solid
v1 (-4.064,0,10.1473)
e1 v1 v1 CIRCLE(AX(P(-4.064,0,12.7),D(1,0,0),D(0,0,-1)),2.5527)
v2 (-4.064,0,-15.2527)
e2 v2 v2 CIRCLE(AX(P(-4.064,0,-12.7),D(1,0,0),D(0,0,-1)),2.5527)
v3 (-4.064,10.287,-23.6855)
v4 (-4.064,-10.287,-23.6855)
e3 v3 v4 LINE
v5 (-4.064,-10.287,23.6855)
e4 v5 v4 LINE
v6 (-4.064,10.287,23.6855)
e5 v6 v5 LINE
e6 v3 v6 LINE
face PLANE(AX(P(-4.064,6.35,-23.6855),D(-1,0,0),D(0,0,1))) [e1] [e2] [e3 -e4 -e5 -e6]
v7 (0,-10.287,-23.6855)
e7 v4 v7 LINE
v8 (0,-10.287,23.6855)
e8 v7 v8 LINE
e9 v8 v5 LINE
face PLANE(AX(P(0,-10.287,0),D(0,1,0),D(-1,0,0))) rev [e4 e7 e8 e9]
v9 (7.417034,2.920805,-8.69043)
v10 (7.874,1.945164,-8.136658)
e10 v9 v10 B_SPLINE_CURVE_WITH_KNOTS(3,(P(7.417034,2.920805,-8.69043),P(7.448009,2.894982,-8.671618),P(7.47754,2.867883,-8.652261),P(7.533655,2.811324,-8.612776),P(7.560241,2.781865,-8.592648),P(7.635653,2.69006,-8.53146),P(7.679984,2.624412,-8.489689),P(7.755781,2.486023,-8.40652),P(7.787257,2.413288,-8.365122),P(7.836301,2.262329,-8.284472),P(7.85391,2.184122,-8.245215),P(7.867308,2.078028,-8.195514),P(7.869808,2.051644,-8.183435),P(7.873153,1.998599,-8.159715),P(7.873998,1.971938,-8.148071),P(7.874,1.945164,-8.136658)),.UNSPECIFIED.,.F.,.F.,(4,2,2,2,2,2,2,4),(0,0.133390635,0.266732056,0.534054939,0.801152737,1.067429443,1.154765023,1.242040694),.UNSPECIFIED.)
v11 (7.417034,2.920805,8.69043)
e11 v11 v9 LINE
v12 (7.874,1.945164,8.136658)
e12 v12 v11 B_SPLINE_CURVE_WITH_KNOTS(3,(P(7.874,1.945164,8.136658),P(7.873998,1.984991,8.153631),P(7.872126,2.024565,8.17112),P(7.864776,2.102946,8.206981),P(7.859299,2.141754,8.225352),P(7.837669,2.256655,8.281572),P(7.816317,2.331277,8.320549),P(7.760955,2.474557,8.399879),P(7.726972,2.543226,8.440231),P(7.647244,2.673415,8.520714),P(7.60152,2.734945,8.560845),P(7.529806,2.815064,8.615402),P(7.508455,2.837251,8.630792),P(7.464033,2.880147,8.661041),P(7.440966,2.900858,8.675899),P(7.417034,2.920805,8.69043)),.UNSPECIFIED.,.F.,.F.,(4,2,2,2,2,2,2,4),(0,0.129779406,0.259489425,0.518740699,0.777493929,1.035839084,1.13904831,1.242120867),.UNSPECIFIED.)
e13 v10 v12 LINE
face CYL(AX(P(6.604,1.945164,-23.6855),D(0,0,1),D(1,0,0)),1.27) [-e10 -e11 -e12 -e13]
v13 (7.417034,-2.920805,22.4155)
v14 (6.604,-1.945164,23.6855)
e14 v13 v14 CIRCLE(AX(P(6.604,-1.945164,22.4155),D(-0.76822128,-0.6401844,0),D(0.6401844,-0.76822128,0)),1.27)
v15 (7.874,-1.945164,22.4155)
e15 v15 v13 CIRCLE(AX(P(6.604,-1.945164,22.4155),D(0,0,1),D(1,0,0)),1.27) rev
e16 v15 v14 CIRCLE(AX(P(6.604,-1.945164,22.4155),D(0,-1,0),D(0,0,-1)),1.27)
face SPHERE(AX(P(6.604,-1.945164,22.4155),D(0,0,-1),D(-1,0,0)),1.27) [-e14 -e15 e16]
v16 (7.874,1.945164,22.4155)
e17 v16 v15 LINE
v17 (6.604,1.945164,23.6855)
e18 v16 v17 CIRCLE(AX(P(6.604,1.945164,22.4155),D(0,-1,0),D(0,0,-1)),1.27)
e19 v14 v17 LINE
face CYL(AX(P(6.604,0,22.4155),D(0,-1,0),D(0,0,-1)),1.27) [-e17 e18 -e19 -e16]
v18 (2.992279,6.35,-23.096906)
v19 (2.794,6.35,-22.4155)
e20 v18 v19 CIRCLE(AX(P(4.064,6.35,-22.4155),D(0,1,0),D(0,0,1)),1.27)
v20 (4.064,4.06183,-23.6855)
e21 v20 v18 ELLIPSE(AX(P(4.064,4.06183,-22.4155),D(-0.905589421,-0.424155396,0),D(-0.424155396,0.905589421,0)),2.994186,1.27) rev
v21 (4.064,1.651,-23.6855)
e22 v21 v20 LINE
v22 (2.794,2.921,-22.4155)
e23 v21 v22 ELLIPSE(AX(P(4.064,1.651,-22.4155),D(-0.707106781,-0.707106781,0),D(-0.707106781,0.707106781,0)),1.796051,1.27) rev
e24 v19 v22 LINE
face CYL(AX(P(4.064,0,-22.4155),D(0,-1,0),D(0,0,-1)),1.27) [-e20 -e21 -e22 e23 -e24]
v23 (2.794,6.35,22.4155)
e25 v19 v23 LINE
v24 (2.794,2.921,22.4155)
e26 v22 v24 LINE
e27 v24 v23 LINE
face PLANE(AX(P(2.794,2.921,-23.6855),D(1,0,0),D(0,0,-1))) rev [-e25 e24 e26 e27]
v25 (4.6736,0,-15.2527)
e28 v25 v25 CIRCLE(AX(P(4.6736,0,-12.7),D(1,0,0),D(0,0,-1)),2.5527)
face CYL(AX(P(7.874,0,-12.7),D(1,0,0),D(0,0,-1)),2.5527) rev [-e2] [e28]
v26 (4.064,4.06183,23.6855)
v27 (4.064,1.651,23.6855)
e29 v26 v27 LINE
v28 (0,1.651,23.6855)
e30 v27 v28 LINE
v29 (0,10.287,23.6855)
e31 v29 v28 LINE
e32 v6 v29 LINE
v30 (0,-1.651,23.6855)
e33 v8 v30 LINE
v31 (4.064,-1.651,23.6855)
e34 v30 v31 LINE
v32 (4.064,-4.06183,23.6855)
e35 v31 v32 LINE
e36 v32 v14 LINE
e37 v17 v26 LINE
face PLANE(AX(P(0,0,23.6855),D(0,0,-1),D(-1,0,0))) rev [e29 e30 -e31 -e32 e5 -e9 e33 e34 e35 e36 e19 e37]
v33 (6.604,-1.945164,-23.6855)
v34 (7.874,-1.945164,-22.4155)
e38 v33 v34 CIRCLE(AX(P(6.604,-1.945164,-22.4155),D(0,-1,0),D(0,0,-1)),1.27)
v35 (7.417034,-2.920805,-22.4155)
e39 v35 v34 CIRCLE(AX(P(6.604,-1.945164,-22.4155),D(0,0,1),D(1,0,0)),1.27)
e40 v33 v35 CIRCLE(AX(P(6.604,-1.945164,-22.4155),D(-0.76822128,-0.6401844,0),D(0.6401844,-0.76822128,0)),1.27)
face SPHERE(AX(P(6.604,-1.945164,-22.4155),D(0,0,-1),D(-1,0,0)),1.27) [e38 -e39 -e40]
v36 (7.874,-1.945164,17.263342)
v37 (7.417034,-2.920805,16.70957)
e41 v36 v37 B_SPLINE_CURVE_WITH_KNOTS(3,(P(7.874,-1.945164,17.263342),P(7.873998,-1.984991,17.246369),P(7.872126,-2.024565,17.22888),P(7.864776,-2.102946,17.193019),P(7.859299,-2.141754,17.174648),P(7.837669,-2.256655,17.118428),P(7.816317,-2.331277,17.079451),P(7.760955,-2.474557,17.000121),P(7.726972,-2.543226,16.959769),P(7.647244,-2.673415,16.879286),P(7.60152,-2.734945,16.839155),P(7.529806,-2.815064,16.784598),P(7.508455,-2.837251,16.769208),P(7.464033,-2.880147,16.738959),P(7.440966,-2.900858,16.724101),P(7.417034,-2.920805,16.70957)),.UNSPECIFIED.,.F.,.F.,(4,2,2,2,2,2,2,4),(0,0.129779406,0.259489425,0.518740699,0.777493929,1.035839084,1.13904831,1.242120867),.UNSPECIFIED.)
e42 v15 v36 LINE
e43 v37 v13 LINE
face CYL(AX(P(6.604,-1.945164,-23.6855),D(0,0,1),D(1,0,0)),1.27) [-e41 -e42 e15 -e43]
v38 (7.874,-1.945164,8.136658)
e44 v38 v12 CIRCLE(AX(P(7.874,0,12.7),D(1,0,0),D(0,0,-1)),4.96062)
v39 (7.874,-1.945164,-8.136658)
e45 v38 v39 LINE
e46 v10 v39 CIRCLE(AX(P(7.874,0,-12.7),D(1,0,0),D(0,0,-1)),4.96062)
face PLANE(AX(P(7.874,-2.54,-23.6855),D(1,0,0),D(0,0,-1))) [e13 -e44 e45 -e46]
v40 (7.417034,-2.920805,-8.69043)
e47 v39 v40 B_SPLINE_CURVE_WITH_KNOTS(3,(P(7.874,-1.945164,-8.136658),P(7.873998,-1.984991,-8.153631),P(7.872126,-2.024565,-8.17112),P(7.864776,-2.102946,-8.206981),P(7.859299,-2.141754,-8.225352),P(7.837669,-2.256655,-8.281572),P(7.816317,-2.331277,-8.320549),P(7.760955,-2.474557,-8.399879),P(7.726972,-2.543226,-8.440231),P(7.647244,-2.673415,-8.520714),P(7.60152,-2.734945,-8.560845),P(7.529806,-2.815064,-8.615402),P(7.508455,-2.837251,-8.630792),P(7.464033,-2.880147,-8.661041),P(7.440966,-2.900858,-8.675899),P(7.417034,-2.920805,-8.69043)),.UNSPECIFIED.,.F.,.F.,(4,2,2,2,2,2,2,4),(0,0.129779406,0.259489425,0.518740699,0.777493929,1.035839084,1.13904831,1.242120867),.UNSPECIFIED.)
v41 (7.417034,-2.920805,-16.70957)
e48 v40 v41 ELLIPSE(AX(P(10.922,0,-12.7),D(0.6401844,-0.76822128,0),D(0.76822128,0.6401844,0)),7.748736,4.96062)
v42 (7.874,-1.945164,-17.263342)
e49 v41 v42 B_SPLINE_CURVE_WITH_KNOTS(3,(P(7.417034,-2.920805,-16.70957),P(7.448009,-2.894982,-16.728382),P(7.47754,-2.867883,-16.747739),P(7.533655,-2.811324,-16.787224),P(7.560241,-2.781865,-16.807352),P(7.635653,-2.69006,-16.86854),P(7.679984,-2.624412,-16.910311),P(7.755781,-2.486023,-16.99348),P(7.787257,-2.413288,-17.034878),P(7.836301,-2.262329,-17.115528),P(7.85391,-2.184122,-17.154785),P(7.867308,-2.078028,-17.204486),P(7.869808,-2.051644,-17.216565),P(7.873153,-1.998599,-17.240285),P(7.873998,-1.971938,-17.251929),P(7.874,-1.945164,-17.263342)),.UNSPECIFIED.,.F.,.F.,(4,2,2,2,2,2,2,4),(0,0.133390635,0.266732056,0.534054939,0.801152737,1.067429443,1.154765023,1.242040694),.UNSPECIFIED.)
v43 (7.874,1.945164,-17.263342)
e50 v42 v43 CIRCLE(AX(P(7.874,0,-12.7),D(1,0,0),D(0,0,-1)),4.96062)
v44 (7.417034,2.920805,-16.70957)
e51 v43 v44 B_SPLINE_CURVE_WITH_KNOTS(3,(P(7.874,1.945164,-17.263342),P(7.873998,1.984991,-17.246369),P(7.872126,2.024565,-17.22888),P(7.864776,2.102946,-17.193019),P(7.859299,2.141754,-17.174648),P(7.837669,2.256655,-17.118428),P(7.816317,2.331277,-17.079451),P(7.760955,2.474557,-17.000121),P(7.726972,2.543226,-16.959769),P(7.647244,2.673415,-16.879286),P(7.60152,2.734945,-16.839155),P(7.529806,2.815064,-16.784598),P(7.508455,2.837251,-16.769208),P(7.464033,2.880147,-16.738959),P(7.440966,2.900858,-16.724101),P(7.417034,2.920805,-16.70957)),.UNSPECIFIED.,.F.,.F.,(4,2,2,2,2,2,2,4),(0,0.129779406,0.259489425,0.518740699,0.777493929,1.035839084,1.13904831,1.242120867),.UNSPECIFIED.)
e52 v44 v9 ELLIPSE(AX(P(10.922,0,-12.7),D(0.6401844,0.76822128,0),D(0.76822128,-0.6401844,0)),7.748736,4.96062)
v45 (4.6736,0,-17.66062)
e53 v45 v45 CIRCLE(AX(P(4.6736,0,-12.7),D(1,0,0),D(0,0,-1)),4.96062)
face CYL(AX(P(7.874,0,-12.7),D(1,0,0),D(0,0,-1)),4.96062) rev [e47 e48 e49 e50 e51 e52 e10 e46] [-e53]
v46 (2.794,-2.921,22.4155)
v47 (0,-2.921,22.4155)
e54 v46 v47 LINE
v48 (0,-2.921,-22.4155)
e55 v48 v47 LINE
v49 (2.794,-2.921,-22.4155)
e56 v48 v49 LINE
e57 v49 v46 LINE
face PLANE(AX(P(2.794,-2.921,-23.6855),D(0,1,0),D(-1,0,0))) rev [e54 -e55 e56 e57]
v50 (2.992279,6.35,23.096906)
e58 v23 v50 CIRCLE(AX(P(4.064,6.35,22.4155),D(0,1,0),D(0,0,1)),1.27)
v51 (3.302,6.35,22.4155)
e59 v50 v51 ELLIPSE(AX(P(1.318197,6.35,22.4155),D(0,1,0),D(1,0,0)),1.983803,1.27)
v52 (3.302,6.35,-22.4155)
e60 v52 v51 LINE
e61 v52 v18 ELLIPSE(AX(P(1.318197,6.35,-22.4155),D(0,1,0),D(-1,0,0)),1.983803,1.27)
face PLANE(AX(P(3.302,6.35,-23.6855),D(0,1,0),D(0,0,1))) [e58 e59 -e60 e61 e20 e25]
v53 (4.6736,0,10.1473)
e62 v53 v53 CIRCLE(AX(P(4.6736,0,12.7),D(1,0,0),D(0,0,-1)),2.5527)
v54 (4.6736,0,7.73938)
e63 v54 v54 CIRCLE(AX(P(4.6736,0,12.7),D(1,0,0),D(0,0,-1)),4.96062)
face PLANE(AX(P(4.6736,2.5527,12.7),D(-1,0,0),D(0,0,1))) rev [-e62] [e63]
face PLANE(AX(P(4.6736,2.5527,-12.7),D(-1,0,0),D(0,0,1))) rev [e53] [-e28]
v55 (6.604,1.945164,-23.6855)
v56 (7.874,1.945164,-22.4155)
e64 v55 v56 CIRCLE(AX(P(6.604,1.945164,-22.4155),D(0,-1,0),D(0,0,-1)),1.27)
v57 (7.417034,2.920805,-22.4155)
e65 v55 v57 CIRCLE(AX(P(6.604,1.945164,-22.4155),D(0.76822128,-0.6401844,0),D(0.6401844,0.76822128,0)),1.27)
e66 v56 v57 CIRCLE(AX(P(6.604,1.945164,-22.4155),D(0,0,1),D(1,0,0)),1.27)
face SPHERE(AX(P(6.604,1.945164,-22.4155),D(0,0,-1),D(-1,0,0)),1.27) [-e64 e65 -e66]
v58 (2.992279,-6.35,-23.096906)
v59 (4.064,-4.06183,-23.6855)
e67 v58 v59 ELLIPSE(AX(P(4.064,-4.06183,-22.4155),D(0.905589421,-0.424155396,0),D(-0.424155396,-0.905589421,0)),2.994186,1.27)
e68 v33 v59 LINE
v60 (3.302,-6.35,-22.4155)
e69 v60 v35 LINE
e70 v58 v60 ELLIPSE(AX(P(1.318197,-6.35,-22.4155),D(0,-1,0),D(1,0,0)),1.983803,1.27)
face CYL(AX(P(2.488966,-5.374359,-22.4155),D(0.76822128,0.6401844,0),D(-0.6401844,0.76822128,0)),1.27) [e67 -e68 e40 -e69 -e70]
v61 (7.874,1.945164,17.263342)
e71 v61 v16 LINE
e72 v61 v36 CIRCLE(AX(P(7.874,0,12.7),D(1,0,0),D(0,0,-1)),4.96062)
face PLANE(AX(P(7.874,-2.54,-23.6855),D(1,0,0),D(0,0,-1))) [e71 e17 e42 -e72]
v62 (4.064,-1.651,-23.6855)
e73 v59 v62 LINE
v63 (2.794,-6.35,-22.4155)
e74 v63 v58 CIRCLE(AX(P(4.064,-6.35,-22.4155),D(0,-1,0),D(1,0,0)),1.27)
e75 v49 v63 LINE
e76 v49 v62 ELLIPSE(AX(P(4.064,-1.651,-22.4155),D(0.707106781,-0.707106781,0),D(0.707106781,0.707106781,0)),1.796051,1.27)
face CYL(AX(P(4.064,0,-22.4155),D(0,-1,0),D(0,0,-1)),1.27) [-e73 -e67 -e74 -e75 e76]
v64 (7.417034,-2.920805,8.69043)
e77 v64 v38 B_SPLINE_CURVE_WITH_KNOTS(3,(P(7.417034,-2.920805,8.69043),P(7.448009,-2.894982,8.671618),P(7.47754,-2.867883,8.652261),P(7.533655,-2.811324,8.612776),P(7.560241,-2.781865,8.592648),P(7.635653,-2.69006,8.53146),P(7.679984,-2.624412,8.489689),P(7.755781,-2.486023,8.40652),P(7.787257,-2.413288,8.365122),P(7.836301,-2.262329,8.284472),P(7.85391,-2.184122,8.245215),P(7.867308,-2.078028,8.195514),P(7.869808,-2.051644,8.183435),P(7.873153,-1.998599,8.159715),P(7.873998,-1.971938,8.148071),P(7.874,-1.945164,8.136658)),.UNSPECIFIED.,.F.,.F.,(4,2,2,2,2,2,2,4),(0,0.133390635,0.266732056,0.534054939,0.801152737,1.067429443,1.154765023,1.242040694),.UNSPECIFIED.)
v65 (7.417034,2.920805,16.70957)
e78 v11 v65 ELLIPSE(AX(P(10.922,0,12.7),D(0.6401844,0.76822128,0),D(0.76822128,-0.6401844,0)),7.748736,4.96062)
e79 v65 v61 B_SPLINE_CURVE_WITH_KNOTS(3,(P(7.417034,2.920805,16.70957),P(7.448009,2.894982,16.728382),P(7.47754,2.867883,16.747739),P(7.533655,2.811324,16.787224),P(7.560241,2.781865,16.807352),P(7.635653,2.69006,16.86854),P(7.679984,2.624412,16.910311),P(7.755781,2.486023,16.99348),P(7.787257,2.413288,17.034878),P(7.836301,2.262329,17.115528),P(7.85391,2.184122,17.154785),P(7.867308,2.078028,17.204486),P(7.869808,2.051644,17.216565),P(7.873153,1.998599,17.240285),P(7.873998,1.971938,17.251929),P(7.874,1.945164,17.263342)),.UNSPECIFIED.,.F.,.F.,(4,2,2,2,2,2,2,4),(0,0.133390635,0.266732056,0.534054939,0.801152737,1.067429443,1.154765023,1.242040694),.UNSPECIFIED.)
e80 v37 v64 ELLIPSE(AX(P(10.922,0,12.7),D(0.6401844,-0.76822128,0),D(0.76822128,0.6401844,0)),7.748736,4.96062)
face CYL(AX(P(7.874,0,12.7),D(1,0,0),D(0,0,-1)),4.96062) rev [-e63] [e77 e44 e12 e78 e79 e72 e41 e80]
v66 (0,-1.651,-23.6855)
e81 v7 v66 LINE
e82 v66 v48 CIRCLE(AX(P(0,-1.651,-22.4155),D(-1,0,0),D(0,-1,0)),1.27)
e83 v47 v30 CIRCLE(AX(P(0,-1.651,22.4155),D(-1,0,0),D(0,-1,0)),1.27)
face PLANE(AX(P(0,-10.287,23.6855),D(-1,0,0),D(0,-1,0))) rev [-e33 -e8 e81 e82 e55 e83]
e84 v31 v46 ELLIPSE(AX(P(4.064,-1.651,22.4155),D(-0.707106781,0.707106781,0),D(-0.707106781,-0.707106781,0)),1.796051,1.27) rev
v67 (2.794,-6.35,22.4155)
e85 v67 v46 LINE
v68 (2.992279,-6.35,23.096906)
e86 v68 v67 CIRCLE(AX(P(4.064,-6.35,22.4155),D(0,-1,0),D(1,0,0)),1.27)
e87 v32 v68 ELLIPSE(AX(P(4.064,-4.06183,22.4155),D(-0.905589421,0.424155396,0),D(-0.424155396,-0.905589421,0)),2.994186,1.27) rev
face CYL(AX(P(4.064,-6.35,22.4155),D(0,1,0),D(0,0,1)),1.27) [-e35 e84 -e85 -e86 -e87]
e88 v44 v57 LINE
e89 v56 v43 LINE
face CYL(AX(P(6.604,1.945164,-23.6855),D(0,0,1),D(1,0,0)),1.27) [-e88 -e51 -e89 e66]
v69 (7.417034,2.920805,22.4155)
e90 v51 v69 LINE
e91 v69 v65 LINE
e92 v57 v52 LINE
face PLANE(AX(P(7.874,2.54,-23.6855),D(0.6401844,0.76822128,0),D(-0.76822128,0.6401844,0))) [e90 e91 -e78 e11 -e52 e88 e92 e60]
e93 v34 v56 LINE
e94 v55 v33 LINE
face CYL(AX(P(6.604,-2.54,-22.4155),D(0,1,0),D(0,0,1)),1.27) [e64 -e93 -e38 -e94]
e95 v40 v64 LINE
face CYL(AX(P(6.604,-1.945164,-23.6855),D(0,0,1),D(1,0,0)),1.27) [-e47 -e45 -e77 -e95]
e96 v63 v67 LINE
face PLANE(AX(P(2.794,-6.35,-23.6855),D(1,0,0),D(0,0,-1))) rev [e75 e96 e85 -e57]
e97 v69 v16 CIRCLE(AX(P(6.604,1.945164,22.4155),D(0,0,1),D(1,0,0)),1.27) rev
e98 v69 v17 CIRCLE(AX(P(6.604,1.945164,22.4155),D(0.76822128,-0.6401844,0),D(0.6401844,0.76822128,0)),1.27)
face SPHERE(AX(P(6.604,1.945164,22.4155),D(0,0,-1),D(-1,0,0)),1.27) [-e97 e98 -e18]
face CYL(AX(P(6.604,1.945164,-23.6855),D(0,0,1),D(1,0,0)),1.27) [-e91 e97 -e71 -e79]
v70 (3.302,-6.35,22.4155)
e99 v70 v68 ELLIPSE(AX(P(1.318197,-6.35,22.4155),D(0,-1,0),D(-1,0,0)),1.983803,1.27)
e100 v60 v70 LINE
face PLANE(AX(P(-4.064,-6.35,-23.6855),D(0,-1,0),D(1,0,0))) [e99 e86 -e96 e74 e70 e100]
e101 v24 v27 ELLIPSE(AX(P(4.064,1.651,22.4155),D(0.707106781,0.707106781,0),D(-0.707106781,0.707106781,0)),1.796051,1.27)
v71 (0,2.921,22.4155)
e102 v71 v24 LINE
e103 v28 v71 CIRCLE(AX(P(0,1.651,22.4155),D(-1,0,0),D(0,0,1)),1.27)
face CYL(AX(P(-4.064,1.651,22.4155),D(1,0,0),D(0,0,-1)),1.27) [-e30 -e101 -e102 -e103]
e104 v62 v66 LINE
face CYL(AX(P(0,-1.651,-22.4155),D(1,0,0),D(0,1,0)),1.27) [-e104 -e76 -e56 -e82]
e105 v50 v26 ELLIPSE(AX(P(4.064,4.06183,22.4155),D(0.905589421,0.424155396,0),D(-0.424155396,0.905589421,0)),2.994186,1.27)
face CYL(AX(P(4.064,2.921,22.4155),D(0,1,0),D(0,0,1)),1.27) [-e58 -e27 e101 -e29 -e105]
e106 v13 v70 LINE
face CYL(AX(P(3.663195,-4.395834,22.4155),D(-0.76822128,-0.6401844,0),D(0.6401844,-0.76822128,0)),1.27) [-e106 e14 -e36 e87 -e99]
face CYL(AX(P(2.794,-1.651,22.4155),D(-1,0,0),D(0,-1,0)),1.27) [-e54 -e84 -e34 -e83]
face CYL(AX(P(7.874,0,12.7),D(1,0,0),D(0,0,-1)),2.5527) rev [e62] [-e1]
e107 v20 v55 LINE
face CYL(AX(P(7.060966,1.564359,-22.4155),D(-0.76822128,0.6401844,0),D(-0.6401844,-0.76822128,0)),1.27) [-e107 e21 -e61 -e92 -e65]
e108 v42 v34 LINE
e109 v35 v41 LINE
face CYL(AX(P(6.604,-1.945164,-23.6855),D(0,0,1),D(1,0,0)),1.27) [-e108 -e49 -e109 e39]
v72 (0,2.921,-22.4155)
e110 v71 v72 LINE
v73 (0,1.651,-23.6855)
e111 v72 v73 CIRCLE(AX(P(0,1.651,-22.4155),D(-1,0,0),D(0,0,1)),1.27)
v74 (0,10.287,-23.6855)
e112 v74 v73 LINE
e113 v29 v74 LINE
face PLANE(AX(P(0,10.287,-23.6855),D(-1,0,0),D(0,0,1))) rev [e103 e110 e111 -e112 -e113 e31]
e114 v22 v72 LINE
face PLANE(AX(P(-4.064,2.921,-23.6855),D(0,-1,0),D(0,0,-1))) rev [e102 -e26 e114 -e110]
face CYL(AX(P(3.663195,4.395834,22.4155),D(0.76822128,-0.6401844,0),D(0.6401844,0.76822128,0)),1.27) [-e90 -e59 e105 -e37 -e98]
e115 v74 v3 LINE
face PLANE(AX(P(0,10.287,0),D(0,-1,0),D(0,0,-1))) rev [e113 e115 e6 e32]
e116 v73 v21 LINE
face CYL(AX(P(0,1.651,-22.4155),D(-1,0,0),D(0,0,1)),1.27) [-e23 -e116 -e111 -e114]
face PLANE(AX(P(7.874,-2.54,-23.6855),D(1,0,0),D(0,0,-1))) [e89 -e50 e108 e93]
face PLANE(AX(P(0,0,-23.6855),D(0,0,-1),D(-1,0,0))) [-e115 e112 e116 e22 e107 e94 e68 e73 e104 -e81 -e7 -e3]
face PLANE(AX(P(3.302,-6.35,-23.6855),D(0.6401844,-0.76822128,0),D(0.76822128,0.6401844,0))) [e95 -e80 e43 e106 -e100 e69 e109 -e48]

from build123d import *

# Parameters (mm, degrees)
BOSS_EXTRUDE1_DEPTH                             = 47.371
SKETCH2_W                                       = 6.858
SKETCH2_H                                       = 3.429
CUT_EXTRUDE1_DEPTH                              = 49.438972089
SKETCH3_W                                       = 4.064
SKETCH3_H                                       = 47.371
BOSS_EXTRUDE2_DEPTH                             = 7.366
SKETCH4_W                                       = 6.858
SKETCH4_H                                       = 3.429
CUT_EXTRUDE2_DEPTH                              = 50.110425431
SKETCH5_W                                       = 4.064
SKETCH5_H                                       = 47.371
BOSS_EXTRUDE3_DEPTH                             = 7.366
F_3_CLEARANCE_HOLE1_D                           = 2.7686
CBORE_FOR_10_BUTTON_HEAD_CAP_SCREW1_D           = 5.1054
CBORE_FOR_10_BUTTON_HEAD_CAP_SCREW1_CBORE_D     = 9.92124
CBORE_FOR_10_BUTTON_HEAD_CAP_SCREW1_CBORE_DEPTH = 3.2004
FILLET1_R                                       = 1.27
FILLET3_R                                       = 1.27
FILLET5_R                                       = 1.27


with BuildPart() as part:
    # Sketch1 → Boss-Extrude1 (new body)
    with BuildSketch(Plane.XY.offset(23.6855)):
        Polygon((3.302, 6.35), (-4.064, 6.35), (-4.064, -6.35), (3.302, -6.35), (7.874, -2.54), (7.874, 2.54), align=None)
    extrude(amount=-BOSS_EXTRUDE1_DEPTH)

    # Sketch2 → Cut-Extrude1 (cut, through all)
    with BuildSketch(Plane.XY.offset(23.6855)):
        with Locations((-0.635, 4.6355)):
            Rectangle(SKETCH2_W, SKETCH2_H)
    extrude(amount=-CUT_EXTRUDE1_DEPTH, mode=Mode.SUBTRACT)

    # Sketch3 → Boss-Extrude2 (add)
    with BuildSketch(Plane(origin=(0, 2.921, 0), x_dir=(-1, 0, 0), z_dir=(0, 1, 0))):
        with Locations((2.032, 0)):
            Rectangle(SKETCH3_W, SKETCH3_H)
    extrude(amount=BOSS_EXTRUDE2_DEPTH)

    # Sketch4 → Cut-Extrude2 (cut, through all)
    with BuildSketch(Plane.XY.offset(23.6855)):
        with Locations((-0.635, -4.6355)):
            Rectangle(SKETCH4_W, SKETCH4_H)
    extrude(amount=-CUT_EXTRUDE2_DEPTH, mode=Mode.SUBTRACT)

    # Sketch5 → Boss-Extrude3 (add)
    with BuildSketch(Plane.XZ.offset(2.921)):
        with Locations((-2.032, 0)):
            Rectangle(SKETCH5_W, SKETCH5_H)
    extrude(amount=BOSS_EXTRUDE3_DEPTH)

    # #3 Clearance Hole1 (through all)
    with Locations(Plane.ZY.offset(4.064)):
        with Locations((12.7, 0), (-12.7, 0)):
            Hole(F_3_CLEARANCE_HOLE1_D / 2)

    # CBORE for #10 Button Head Cap Screw1 (through all)
    with Locations(Plane(origin=(7.874, 0, 0), x_dir=(0, 0, -1), z_dir=(1, 0, 0))):
        with Locations((-12.7, 0), (12.7, 0)):
            CounterBoreHole(CBORE_FOR_10_BUTTON_HEAD_CAP_SCREW1_D / 2, CBORE_FOR_10_BUTTON_HEAD_CAP_SCREW1_CBORE_D / 2, CBORE_FOR_10_BUTTON_HEAD_CAP_SCREW1_CBORE_DEPTH)

    # Fillet1
    fillet1_edges = [part.edges().sort_by_distance(p)[0] for p in [
        (7.874, -2.54, 20.323251747),
        (7.874, -2.54, -20.323251747),
        (7.874, -2.54, 0),
        (7.874, 2.54, 20.323251747),
        (7.874, 2.54, 0),
        (7.874, 2.54, -20.323251747),
    ]]
    fillet(fillet1_edges, radius=FILLET1_R)

    # Fillet3
    # the kernel refuses this fillet: 1.27 mm, written as the material it takes off along each edge
    with BuildSketch(Plane(origin=(0.862897437, -8.382585469, -23.6855), x_dir=(0, 0, 1), z_dir=(0.7682212795973759, 0.6401843996644799, 0)), Plane(origin=(7.417034188, 2.920804844, -23.6855), x_dir=(0, 0, 1), z_dir=(-0.7682212795973759, 0.6401843996644799, 0))) as fillet3_piece_1:
        with BuildLine():
            CenterArc((FILLET3_R, -FILLET3_R), FILLET3_R, 90, 90)
            Line((0, -FILLET3_R), (0, 0))
            Line((0, 0), (FILLET3_R, 0))
        make_face()
    extrude(amount=8.531574072, mode=Mode.SUBTRACT)
    with BuildSketch(Plane(origin=(6.604, -1.945163819, -23.6855), x_dir=(0.6401843996644796, -0.7682212795973762, 0), z_dir=(-0.7682212795973762, -0.6401843996644796, 0))) as fillet3_piece_2:
        with BuildLine():
            CenterArc((1.27 - FILLET3_R, FILLET3_R), FILLET3_R, 270, 90)
            Line((1.27, FILLET3_R), (1.27, 0))
            Line((1.27, 0), (1.27 - FILLET3_R, 0))
        make_face()
    revolve(axis=Axis((6.604, -1.945163819, -23.6855), (0, 0, 1)), revolution_arc=50.194428908, mode=Mode.SUBTRACT)
    with BuildSketch(Plane(origin=(6.604, 1.945163819, -23.6855), x_dir=(0.6401843996644799, 0.7682212795973757, 0), z_dir=(-0.7682212795973757, 0.6401843996644799, 0))) as fillet3_piece_3:
        with BuildLine():
            CenterArc((1.27 - FILLET3_R, -FILLET3_R), FILLET3_R, 0, 90)
            Line((1.27, -FILLET3_R), (1.27, 0))
            Line((1.27, 0), (1.27 - FILLET3_R, 0))
        make_face()
    revolve(axis=Axis((6.604, 1.945163819, -23.6855), (0, 0, -1)), revolution_arc=50.194428908, mode=Mode.SUBTRACT)
    with BuildSketch(Plane(origin=(2.794, -2.921, -23.6855), x_dir=(0, 0, 1), z_dir=(-1, 0, 0)), Plane(origin=(0, 2.921, -23.6855), x_dir=(0, 0, 1), z_dir=(1, 0, 0))) as fillet3_piece_4:
        with BuildLine():
            CenterArc((FILLET3_R, FILLET3_R), FILLET3_R, 180, 90)
            Line((0, FILLET3_R), (0, 0))
            Line((0, 0), (FILLET3_R, 0))
        make_face()
    extrude(amount=2.794, mode=Mode.SUBTRACT)
    with BuildSketch(Plane(origin=(2.794, 2.921, -23.6855), x_dir=(0, 0, 1), z_dir=(0, 1, 0)), Plane(origin=(2.794, -9.525, -23.6855), x_dir=(0, 0, 1), z_dir=(0, 1, 0))) as fillet3_piece_5:
        with BuildLine():
            CenterArc((FILLET3_R, FILLET3_R), FILLET3_R, 180, 90)
            Line((0, FILLET3_R), (0, 0))
            Line((0, 0), (FILLET3_R, 0))
        make_face()
    extrude(amount=6.604, mode=Mode.SUBTRACT)
    with BuildSketch(Plane(origin=(7.874, -1.945163819, -23.6855), x_dir=(-1, 0, 0), z_dir=(0, 1, 0))) as fillet3_piece_6:
        with BuildLine():
            CenterArc((FILLET3_R, FILLET3_R), FILLET3_R, 180, 90)
            Line((0, FILLET3_R), (0, 0))
            Line((0, 0), (FILLET3_R, 0))
        make_face()
    extrude(amount=3.890327637, mode=Mode.SUBTRACT)
    with BuildSketch(Plane(origin=(2.794, -9.525, -23.6855), x_dir=(0, 0, 1), z_dir=(0, 1, 0))) as fillet3_piece_7a_section:
        with BuildLine():
            CenterArc((FILLET3_R, FILLET3_R), FILLET3_R, 180, 90)
            Line((0, FILLET3_R), (0, 0))
            Line((0, 0), (FILLET3_R, 0))
        make_face()
    fillet3_piece_7a = extrude(amount=9.779, mode=Mode.PRIVATE)
    fillet3_piece_7a = split(fillet3_piece_7a, bisect_by=Plane(origin=(3.081521795, -2.921, -23.397978205), z_dir=(0, 1, 0)), keep=Keep.TOP, mode=Mode.PRIVATE)
    with BuildSketch(Plane(origin=(5.969, -2.921, -23.6855), x_dir=(0, 0, 1), z_dir=(-1, 0, 0))) as fillet3_piece_7b_section:
        with BuildLine():
            CenterArc((FILLET3_R, FILLET3_R), FILLET3_R, 180, 90)
            Line((0, FILLET3_R), (0, 0))
            Line((0, 0), (FILLET3_R, 0))
        make_face()
    fillet3_piece_7b = extrude(amount=5.969, mode=Mode.PRIVATE)
    fillet3_piece_7b = split(fillet3_piece_7b, bisect_by=Plane(origin=(2.794, -2.633478205, -23.397978205), z_dir=(1, 0, 0)), keep=Keep.TOP, mode=Mode.PRIVATE)
    fillet3_piece_7 = fillet3_piece_7a & fillet3_piece_7b
    add(fillet3_piece_7, mode=Mode.SUBTRACT)
    with BuildSketch(Plane(origin=(2.794, -0.254, -23.6855), x_dir=(0, 0, 1), z_dir=(0, 1, 0))) as fillet3_piece_8a_section:
        with BuildLine():
            CenterArc((FILLET3_R, FILLET3_R), FILLET3_R, 180, 90)
            Line((0, FILLET3_R), (0, 0))
            Line((0, 0), (FILLET3_R, 0))
        make_face()
    fillet3_piece_8a = extrude(amount=9.779, mode=Mode.PRIVATE)
    fillet3_piece_8a = split(fillet3_piece_8a, bisect_by=Plane(origin=(3.081521795, 2.921, -23.397978205), z_dir=(0, -1, 0)), keep=Keep.TOP, mode=Mode.PRIVATE)
    with BuildSketch(Plane(origin=(0, 2.921, -23.6855), x_dir=(0, 0, 1), z_dir=(1, 0, 0))) as fillet3_piece_8b_section:
        with BuildLine():
            CenterArc((FILLET3_R, FILLET3_R), FILLET3_R, 180, 90)
            Line((0, FILLET3_R), (0, 0))
            Line((0, 0), (FILLET3_R, 0))
        make_face()
    fillet3_piece_8b = extrude(amount=5.969, mode=Mode.PRIVATE)
    fillet3_piece_8b = split(fillet3_piece_8b, bisect_by=Plane(origin=(2.794, 2.633478205, -23.397978205), z_dir=(1, 0, 0)), keep=Keep.TOP, mode=Mode.PRIVATE)
    fillet3_piece_8 = fillet3_piece_8a & fillet3_piece_8b
    add(fillet3_piece_8, mode=Mode.SUBTRACT)

    # Fillet5
    # the kernel refuses this fillet: 1.27 mm, written as the material it takes off along each edge
    with BuildSketch(Plane(origin=(0.862897437, -8.382585469, 23.6855), x_dir=(-0.6401843996644799, 0.7682212795973759, 0), z_dir=(0.7682212795973759, 0.6401843996644799, 0)), Plane(origin=(7.417034188, 2.920804844, 23.6855), x_dir=(-0.6401843996644799, -0.7682212795973759, 0), z_dir=(-0.7682212795973759, 0.6401843996644799, 0))) as fillet5_piece_1:
        with BuildLine():
            CenterArc((FILLET5_R, -FILLET5_R), FILLET5_R, 90, 90)
            Line((0, -FILLET5_R), (0, 0))
            Line((0, 0), (FILLET5_R, 0))
        make_face()
    extrude(amount=8.531574072, mode=Mode.SUBTRACT)
    with BuildSketch(Plane(origin=(6.604, -1.945163819, 23.6855), x_dir=(1, 0, 0), z_dir=(0, 1, 0))) as fillet5_piece_2:
        with BuildLine():
            CenterArc((1.27 - FILLET5_R, FILLET5_R), FILLET5_R, 270, 90)
            Line((1.27, FILLET5_R), (1.27, 0))
            Line((1.27, 0), (1.27 - FILLET5_R, 0))
        make_face()
    revolve(axis=Axis((6.604, -1.945163819, 23.6855), (0, 0, -1)), revolution_arc=50.194428908, mode=Mode.SUBTRACT)
    with BuildSketch(Plane(origin=(6.604, 1.945163819, 23.6855), x_dir=(0.6401843996644799, 0.7682212795973757, 0), z_dir=(-0.7682212795973757, 0.6401843996644799, 0))) as fillet5_piece_3:
        with BuildLine():
            CenterArc((1.27 - FILLET5_R, FILLET5_R), FILLET5_R, 270, 90)
            Line((1.27, FILLET5_R), (1.27, 0))
            Line((1.27, 0), (1.27 - FILLET5_R, 0))
        make_face()
    revolve(axis=Axis((6.604, 1.945163819, 23.6855), (0, 0, -1)), revolution_arc=50.194428908, mode=Mode.SUBTRACT)
    with BuildSketch(Plane(origin=(2.794, 2.921, 23.6855), x_dir=(1, 0, 0), z_dir=(0, 1, 0)), Plane(origin=(2.794, -9.525, 23.6855), x_dir=(1, 0, 0), z_dir=(0, 1, 0))) as fillet5_piece_4:
        with BuildLine():
            CenterArc((FILLET5_R, FILLET5_R), FILLET5_R, 180, 90)
            Line((0, FILLET5_R), (0, 0))
            Line((0, 0), (FILLET5_R, 0))
        make_face()
    extrude(amount=6.604, mode=Mode.SUBTRACT)
    with BuildSketch(Plane(origin=(0, 2.921, 23.6855), x_dir=(0, -1, 0), z_dir=(1, 0, 0)), Plane(origin=(2.794, -2.921, 23.6855), x_dir=(0, 1, 0), z_dir=(-1, 0, 0))) as fillet5_piece_5:
        with BuildLine():
            CenterArc((FILLET5_R, FILLET5_R), FILLET5_R, 180, 90)
            Line((0, FILLET5_R), (0, 0))
            Line((0, 0), (FILLET5_R, 0))
        make_face()
    extrude(amount=2.794, mode=Mode.SUBTRACT)
    with BuildSketch(Plane(origin=(7.874, -1.945163819, 23.6855), x_dir=(-1, 0, 0), z_dir=(0, 1, 0))) as fillet5_piece_6:
        with BuildLine():
            CenterArc((FILLET5_R, -FILLET5_R), FILLET5_R, 90, 90)
            Line((0, -FILLET5_R), (0, 0))
            Line((0, 0), (FILLET5_R, 0))
        make_face()
    extrude(amount=3.890327637, mode=Mode.SUBTRACT)
    with BuildSketch(Plane(origin=(2.794, -0.254, 23.6855), x_dir=(1, 0, 0), z_dir=(0, 1, 0))) as fillet5_piece_7a_section:
        with BuildLine():
            CenterArc((FILLET5_R, FILLET5_R), FILLET5_R, 180, 90)
            Line((0, FILLET5_R), (0, 0))
            Line((0, 0), (FILLET5_R, 0))
        make_face()
    fillet5_piece_7a = extrude(amount=9.779, mode=Mode.PRIVATE)
    fillet5_piece_7a = split(fillet5_piece_7a, bisect_by=Plane(origin=(3.081521795, 2.921, 23.397978205), z_dir=(0, -1, 0)), keep=Keep.TOP, mode=Mode.PRIVATE)
    with BuildSketch(Plane(origin=(0, 2.921, 23.6855), x_dir=(0, -1, 0), z_dir=(1, 0, 0))) as fillet5_piece_7b_section:
        with BuildLine():
            CenterArc((FILLET5_R, FILLET5_R), FILLET5_R, 180, 90)
            Line((0, FILLET5_R), (0, 0))
            Line((0, 0), (FILLET5_R, 0))
        make_face()
    fillet5_piece_7b = extrude(amount=5.969, mode=Mode.PRIVATE)
    fillet5_piece_7b = split(fillet5_piece_7b, bisect_by=Plane(origin=(2.794, 2.633478205, 23.397978205), z_dir=(1, 0, 0)), keep=Keep.TOP, mode=Mode.PRIVATE)
    fillet5_piece_7 = fillet5_piece_7a & fillet5_piece_7b
    add(fillet5_piece_7, mode=Mode.SUBTRACT)
    with BuildSketch(Plane(origin=(2.794, -9.525, 23.6855), x_dir=(1, 0, 0), z_dir=(0, 1, 0))) as fillet5_piece_8a_section:
        with BuildLine():
            CenterArc((FILLET5_R, FILLET5_R), FILLET5_R, 180, 90)
            Line((0, FILLET5_R), (0, 0))
            Line((0, 0), (FILLET5_R, 0))
        make_face()
    fillet5_piece_8a = extrude(amount=9.779, mode=Mode.PRIVATE)
    fillet5_piece_8a = split(fillet5_piece_8a, bisect_by=Plane(origin=(3.081521795, -2.921, 23.397978205), z_dir=(0, 1, 0)), keep=Keep.TOP, mode=Mode.PRIVATE)
    with BuildSketch(Plane(origin=(5.969, -2.921, 23.6855), x_dir=(0, 1, 0), z_dir=(-1, 0, 0))) as fillet5_piece_8b_section:
        with BuildLine():
            CenterArc((FILLET5_R, FILLET5_R), FILLET5_R, 180, 90)
            Line((0, FILLET5_R), (0, 0))
            Line((0, 0), (FILLET5_R, 0))
        make_face()
    fillet5_piece_8b = extrude(amount=5.969, mode=Mode.PRIVATE)
    fillet5_piece_8b = split(fillet5_piece_8b, bisect_by=Plane(origin=(2.794, -2.633478205, 23.397978205), z_dir=(1, 0, 0)), keep=Keep.TOP, mode=Mode.PRIVATE)
    fillet5_piece_8 = fillet5_piece_8a & fillet5_piece_8b
    add(fillet5_piece_8, mode=Mode.SUBTRACT)


solid = part.part
